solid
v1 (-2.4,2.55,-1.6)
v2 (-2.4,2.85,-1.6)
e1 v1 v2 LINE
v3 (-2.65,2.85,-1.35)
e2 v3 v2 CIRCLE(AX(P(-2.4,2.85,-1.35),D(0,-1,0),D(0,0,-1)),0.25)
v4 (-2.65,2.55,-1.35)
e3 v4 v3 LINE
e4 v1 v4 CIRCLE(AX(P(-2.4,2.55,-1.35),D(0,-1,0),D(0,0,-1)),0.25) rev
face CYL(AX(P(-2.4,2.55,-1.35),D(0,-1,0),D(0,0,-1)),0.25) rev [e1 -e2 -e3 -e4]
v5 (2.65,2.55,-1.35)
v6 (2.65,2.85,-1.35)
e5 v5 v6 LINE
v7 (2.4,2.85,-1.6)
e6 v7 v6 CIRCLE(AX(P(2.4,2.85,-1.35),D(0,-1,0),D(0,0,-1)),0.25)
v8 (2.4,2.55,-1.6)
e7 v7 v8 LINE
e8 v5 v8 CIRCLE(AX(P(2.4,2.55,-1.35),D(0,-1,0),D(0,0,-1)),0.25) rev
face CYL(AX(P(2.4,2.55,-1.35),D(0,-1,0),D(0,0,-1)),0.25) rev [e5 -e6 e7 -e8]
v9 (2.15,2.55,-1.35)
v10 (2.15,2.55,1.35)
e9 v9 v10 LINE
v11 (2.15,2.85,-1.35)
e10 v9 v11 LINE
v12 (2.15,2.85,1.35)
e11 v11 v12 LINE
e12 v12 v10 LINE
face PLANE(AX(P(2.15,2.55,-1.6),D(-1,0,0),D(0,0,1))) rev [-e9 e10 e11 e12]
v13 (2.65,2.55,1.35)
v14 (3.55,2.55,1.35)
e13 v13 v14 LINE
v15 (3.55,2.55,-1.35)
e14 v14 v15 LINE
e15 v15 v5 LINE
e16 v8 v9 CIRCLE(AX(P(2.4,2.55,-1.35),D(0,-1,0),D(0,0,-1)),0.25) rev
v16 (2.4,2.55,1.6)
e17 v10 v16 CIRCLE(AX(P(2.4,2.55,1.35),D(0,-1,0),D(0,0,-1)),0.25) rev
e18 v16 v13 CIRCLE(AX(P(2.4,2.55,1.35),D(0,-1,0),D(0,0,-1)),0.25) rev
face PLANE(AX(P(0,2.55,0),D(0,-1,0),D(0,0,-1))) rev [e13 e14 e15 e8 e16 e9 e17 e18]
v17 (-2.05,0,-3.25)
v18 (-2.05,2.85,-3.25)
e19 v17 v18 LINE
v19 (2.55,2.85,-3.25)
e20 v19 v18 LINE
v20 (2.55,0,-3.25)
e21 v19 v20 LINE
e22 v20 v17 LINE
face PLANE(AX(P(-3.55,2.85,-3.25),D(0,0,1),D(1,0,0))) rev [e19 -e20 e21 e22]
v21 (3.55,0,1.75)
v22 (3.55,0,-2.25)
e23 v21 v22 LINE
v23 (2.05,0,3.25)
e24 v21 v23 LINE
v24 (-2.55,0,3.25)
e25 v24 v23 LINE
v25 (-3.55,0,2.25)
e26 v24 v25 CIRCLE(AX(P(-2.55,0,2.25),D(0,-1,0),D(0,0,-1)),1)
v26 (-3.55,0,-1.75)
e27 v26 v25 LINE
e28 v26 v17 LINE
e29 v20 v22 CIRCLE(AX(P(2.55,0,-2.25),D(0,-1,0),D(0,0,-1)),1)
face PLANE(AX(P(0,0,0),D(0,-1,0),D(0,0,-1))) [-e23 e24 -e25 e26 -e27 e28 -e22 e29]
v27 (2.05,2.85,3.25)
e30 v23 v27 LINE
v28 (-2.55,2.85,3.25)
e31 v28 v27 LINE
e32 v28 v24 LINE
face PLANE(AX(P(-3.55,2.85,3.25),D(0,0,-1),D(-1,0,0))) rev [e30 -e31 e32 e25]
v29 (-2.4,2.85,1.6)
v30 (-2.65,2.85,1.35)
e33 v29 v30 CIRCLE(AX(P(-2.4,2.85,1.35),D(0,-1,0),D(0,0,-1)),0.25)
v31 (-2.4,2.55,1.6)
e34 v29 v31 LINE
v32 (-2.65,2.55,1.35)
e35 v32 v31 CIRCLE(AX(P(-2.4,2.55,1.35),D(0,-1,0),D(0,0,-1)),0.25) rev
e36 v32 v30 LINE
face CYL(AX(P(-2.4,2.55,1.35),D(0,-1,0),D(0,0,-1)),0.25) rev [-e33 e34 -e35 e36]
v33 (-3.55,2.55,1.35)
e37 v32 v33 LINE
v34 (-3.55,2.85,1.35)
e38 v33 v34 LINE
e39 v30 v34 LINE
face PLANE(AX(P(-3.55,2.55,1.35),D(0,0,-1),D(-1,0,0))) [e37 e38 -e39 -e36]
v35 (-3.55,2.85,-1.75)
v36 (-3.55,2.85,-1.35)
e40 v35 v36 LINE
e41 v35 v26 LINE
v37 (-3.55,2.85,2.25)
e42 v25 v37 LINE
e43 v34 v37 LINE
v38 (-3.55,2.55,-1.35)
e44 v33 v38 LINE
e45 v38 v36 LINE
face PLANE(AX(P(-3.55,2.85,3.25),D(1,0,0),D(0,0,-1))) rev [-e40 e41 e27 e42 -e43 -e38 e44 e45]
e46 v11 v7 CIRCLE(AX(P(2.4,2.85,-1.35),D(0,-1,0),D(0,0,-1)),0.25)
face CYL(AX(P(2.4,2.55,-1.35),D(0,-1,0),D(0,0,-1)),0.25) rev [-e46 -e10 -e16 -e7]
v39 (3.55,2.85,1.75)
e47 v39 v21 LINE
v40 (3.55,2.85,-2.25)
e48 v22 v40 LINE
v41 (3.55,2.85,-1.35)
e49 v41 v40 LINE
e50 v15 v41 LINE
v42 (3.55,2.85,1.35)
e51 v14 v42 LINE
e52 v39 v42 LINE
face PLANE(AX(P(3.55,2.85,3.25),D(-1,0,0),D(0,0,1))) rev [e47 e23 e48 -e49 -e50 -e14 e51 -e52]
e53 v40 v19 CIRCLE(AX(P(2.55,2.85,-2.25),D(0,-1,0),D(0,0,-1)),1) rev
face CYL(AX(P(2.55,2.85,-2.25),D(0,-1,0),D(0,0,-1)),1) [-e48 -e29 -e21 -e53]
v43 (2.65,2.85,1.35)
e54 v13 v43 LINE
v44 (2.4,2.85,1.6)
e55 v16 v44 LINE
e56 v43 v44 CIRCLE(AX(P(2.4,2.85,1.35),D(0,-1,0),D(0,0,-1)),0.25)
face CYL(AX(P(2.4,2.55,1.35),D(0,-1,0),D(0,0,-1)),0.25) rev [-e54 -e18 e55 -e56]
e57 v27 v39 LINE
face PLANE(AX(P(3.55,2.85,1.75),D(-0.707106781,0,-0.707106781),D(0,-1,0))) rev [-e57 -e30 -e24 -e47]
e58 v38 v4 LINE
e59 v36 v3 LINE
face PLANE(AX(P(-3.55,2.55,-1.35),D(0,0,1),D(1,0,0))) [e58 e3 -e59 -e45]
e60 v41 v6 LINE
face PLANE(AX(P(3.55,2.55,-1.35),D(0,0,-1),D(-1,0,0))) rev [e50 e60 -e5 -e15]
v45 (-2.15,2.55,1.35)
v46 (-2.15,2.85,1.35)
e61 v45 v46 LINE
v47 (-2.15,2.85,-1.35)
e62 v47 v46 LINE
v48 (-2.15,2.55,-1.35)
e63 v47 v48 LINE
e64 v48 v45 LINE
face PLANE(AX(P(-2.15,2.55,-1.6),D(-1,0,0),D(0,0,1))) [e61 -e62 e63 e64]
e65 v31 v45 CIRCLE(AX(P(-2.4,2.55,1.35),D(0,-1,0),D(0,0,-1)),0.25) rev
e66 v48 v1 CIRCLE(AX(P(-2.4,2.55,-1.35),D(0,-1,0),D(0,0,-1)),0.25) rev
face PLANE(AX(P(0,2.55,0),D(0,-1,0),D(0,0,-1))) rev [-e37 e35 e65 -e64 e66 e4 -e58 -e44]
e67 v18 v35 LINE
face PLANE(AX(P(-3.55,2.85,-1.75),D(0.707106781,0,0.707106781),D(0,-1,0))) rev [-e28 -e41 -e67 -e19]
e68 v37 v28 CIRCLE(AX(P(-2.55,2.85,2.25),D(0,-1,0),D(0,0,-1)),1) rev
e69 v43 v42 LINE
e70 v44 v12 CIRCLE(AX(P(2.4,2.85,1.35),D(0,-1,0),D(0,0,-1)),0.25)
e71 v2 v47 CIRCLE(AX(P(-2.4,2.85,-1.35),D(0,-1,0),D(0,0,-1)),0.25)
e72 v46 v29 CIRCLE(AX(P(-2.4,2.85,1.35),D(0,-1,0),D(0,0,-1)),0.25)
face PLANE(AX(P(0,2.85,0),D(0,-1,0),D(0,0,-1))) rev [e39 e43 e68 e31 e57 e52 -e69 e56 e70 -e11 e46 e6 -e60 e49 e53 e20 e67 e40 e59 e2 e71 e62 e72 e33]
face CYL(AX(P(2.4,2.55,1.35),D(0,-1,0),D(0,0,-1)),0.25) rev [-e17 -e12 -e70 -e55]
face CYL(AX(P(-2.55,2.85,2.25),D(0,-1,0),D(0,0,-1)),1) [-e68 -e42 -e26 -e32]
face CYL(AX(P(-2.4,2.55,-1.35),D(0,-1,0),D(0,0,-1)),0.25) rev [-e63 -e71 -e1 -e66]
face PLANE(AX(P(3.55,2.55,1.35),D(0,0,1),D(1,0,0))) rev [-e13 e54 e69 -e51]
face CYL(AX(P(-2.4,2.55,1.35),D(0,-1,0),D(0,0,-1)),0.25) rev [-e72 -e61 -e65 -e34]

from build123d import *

# Parameters (mm, degrees)
SKETCH1_W            = 7.1
SKETCH1_H            = 6.5
BOSS_EXTRUDE1_DEPTH  = 2.85
CHAMFER1_SIZE        = 1.5
FILLET1_R            = 1
SKETCH2_W            = 0.9
SKETCH2_H            = 2.7
CUT_EXTRUDE1_DEPTH   = 0.3
SKETCH3_W            = 0.5
SKETCH3_H            = 3.2
CUT_EXTRUDE2_DEPTH   = 0.3
FILLET2_R            = 0.25
FILLET2_OF_MIRROR1_R = 0.25


with BuildPart() as part:
    # Sketch1 → Boss-Extrude1 (new body)
    with BuildSketch(Plane(origin=(0, 0, 0), x_dir=(1, 0, 0), z_dir=(0, 1, 0))):
        Rectangle(SKETCH1_W, SKETCH1_H)
    extrude(amount=BOSS_EXTRUDE1_DEPTH)

    # Chamfer1
    chamfer1_edges = [part.edges().sort_by_distance(p)[0] for p in [
        (3.55, 1.425, 3.25),
        (-3.55, 1.425, -3.25),
    ]]
    chamfer(chamfer1_edges, length=CHAMFER1_SIZE)

    # Fillet1
    fillet1_edges = [part.edges().sort_by_distance(p)[0] for p in [
        (-3.55, 1.425, 3.25),
        (3.55, 1.425, -3.25),
    ]]
    fillet(fillet1_edges, radius=FILLET1_R)

    # Sketch2 → Cut-Extrude1 (cut)
    with BuildSketch(Plane(origin=(0, 2.85, 0), x_dir=(1, 0, 0), z_dir=(0, 1, 0))):
        with Locations((3.1, 0)):
            Rectangle(SKETCH2_W, SKETCH2_H)
    cut_extrude1 = extrude(amount=-CUT_EXTRUDE1_DEPTH, mode=Mode.SUBTRACT)

    # Sketch3 → Cut-Extrude2 (cut)
    with BuildSketch(Plane(origin=(0, 2.85, 0), x_dir=(1, 0, 0), z_dir=(0, 1, 0))):
        with Locations((2.4, 0)):
            Rectangle(SKETCH3_W, SKETCH3_H)
    cut_extrude2 = extrude(amount=-CUT_EXTRUDE2_DEPTH, mode=Mode.SUBTRACT)

    # Fillet2
    fillet2_edges = [part.edges().sort_by_distance(p)[0] for p in [
        (2.65, 2.7, 1.6),
        (2.15, 2.7, 1.6),
        (2.65, 2.7, -1.6),
        (2.15, 2.7, -1.6),
    ]]
    fillet(fillet2_edges, radius=FILLET2_R - 0.0001)  # a hair under: the kernel refuses the full size

    # Mirror1: Cut-Extrude1, Cut-Extrude2 across plane
    add(cut_extrude1.mirror(Plane(origin=(0, 0, 0), x_dir=(0, 0, 1), z_dir=(1, 0, 0))), mode=Mode.SUBTRACT)
    add(cut_extrude2.mirror(Plane(origin=(0, 0, 0), x_dir=(0, 0, 1), z_dir=(1, 0, 0))), mode=Mode.SUBTRACT)

    # Fillet2 of Mirror1
    fillet2_of_mirror1_edges = [part.edges().sort_by_distance(p)[0] for p in [
        (-2.65, 2.7, 1.6),
        (-2.15, 2.7, 1.6),
        (-2.65, 2.7, -1.6),
        (-2.15, 2.7, -1.6),
    ]]
    fillet(fillet2_of_mirror1_edges, radius=FILLET2_OF_MIRROR1_R - 0.0001)  # a hair under: the kernel refuses the full size


solid = part.part
